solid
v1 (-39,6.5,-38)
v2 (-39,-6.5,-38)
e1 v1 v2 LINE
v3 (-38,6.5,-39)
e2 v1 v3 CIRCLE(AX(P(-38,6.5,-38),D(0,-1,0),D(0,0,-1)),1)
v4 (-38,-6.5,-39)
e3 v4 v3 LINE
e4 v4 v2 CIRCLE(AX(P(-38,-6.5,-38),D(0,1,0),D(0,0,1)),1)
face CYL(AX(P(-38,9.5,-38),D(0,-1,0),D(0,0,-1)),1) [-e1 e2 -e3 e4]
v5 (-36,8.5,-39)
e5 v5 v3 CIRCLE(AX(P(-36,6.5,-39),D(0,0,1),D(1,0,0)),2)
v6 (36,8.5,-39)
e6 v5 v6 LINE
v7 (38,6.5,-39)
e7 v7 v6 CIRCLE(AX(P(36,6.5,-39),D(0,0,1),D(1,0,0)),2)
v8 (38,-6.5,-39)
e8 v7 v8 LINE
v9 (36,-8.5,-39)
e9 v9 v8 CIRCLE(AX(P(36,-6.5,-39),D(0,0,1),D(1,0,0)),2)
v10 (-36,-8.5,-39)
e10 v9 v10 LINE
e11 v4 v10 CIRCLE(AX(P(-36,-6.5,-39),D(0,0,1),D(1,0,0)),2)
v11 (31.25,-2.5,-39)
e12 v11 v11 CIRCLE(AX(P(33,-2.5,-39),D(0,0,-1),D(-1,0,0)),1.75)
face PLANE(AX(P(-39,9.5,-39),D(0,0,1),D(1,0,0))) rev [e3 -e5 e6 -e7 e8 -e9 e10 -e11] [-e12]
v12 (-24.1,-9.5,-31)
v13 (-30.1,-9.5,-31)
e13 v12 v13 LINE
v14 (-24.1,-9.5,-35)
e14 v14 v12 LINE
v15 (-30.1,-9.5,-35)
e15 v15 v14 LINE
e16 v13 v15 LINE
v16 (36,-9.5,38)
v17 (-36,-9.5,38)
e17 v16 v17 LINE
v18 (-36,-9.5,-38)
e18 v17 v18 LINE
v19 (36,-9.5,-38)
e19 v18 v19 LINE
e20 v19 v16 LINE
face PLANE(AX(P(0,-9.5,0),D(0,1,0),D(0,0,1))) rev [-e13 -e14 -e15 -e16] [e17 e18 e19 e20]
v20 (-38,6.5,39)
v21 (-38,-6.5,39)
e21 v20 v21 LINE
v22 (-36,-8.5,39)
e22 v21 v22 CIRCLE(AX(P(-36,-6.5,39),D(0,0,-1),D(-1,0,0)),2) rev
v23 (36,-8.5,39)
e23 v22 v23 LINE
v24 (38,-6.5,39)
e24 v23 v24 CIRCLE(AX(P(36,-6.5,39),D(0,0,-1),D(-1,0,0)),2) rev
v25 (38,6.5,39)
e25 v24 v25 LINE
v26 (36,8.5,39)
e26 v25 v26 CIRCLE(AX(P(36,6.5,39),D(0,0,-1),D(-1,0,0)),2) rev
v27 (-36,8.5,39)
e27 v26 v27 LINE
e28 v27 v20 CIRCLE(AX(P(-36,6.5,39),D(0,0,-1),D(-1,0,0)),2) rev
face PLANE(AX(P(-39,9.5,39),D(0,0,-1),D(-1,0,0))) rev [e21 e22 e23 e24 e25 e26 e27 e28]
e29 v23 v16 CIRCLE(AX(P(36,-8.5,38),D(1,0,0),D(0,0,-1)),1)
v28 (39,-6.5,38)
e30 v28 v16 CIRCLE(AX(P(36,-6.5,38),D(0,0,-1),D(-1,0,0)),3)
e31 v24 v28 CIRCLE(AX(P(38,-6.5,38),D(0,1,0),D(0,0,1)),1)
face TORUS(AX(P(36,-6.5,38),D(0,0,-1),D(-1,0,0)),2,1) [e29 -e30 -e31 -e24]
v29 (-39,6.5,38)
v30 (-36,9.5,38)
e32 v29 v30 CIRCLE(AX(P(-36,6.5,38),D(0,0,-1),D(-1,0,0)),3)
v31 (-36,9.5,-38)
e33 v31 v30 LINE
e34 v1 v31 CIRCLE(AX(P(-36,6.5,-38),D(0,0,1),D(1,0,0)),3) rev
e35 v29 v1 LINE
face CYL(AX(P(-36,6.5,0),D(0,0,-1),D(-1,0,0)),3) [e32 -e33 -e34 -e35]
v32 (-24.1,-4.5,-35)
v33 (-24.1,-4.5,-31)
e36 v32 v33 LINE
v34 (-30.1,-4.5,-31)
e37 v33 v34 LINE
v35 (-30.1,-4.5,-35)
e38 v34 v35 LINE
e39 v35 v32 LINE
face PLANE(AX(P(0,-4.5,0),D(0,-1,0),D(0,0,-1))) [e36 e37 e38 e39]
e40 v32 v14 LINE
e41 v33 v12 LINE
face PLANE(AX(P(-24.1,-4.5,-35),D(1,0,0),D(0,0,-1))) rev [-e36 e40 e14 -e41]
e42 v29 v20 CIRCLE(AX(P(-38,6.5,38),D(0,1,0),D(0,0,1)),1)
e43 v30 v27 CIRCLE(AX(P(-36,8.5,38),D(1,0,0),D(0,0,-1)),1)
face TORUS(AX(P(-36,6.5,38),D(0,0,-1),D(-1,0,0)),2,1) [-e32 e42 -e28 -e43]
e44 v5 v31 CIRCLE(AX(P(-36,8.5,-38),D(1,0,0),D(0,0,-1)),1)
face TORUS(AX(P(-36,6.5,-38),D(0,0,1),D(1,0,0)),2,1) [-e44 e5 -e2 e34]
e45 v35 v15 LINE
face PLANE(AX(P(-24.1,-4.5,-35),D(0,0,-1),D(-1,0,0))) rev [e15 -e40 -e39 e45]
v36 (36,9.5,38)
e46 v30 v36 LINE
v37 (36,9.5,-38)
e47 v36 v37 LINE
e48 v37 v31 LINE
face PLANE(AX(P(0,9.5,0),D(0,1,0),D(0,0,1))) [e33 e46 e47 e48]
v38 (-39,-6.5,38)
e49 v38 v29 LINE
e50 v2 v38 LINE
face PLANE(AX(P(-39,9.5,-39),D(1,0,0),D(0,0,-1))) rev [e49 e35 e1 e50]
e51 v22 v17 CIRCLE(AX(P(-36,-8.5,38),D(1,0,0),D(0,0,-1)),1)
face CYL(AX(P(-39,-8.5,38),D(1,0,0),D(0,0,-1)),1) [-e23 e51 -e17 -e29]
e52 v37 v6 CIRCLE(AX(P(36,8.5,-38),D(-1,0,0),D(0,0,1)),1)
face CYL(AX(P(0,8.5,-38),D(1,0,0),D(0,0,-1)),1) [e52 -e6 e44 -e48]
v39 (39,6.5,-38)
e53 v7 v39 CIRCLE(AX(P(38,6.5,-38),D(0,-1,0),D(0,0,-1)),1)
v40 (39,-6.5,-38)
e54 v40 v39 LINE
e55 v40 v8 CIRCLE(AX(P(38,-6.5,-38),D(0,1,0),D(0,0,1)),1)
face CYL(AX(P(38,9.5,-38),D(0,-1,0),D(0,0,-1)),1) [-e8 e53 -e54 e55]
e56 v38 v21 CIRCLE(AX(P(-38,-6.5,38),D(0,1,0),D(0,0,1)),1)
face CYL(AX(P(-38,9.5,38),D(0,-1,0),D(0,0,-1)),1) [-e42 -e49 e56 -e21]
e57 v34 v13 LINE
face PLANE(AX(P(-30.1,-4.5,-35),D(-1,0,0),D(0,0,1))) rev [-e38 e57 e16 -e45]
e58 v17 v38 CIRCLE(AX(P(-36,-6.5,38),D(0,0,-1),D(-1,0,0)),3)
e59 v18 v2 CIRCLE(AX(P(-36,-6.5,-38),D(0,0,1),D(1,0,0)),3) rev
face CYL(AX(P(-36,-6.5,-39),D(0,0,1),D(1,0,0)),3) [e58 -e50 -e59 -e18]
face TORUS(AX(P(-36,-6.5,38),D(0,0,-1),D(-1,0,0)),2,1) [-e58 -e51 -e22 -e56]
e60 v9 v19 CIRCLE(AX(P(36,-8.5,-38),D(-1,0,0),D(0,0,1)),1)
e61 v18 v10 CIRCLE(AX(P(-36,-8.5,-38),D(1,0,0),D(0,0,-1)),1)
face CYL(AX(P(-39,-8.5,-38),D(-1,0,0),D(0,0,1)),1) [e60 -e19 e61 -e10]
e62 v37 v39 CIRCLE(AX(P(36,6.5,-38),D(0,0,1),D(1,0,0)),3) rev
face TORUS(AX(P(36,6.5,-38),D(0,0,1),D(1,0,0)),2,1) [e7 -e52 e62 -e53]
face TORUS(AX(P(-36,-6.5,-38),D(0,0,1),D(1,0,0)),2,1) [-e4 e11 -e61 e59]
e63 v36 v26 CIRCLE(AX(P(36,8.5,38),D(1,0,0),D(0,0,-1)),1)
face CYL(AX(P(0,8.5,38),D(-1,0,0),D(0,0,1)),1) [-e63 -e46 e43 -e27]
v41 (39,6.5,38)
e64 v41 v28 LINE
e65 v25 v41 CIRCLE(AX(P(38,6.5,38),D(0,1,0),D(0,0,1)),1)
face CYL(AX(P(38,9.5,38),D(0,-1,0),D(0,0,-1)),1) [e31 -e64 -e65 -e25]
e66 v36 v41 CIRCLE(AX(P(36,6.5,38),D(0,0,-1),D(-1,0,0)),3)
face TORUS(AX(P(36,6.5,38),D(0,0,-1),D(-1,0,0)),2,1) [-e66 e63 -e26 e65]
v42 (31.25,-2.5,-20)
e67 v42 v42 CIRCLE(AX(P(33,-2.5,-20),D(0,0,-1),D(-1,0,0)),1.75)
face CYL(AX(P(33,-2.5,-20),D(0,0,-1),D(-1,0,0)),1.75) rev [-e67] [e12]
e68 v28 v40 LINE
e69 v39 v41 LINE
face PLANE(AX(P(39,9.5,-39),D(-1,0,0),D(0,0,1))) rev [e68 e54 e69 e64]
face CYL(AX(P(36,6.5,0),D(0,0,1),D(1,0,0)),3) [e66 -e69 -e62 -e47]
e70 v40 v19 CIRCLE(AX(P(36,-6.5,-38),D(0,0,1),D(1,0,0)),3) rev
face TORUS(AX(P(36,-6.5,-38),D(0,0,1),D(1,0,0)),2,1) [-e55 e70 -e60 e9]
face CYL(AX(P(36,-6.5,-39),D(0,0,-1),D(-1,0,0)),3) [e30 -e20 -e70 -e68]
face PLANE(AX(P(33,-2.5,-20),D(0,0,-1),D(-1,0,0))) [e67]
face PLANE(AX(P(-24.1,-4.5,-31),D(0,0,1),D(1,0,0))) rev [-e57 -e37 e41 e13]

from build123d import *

# Parameters (mm, degrees)
SKETCH1_W           = 78
SKETCH1_H           = 78
BOSS_EXTRUDE1_DEPTH = 9.5
SKETCH2_R           = 1.75
CUT_EXTRUDE1_DEPTH  = 19
SKETCH3_W           = 6
SKETCH3_H           = 4
CUT_EXTRUDE2_DEPTH  = 5
FILLET2_R           = 1
FILLET3_R           = 3
FILLET4_R           = 1


with BuildPart() as part:
    # Sketch1 → Boss-Extrude1 (new, symmetric)
    with BuildSketch(Plane(origin=(0, 0, 0), x_dir=(1, 0, 0), z_dir=(0, 1, 0))):
        Rectangle(SKETCH1_W, SKETCH1_H)
    extrude(amount=BOSS_EXTRUDE1_DEPTH, both=True)

    # Sketch2 → Cut-Extrude1 (cut)
    with BuildSketch(Plane(origin=(0, 0, -39), x_dir=(-1, 0, 0), z_dir=(0, 0, -1))):
        with Locations((-33, -2.5)):
            Circle(SKETCH2_R)
    extrude(amount=-CUT_EXTRUDE1_DEPTH, mode=Mode.SUBTRACT)

    # Sketch3 → Cut-Extrude2 (cut)
    with BuildSketch(Plane.XZ.offset(9.5)):
        with Locations((-27.1, -33)):
            Rectangle(SKETCH3_W, SKETCH3_H)
    extrude(amount=-CUT_EXTRUDE2_DEPTH, mode=Mode.SUBTRACT)

    # Fillet2
    fillet2_edges = [part.edges().sort_by_distance(p)[0] for p in [
        (0, -9.5, -39),
        (-39, 0, -39),
        (39, 0, -39),
        (0, 9.5, -39),
    ]]
    fillet(fillet2_edges, radius=FILLET2_R)

    # Fillet3
    # the kernel refuses this fillet: 3 mm, written as the material it takes off along each edge
    with BuildSketch(Plane(origin=(36, 6.5, -39), x_dir=(0, 1, 0), z_dir=(-1, 0, 0))) as fillet3_piece_1:
        with BuildLine():
            CenterArc((2, -1), 1, 0, 90)
            Line((3, -1), (3, 0))
            Line((3, 0), (2, 0))
        make_face()
    revolve(axis=Axis((36, 6.5, -39), (0, 0, -1)), revolution_arc=90, mode=Mode.SUBTRACT)
    with BuildSketch(Plane(origin=(36, -6.5, -39), x_dir=(1, 0, 0), z_dir=(0, 1, 0))) as fillet3_piece_2:
        with BuildLine():
            CenterArc((2, -1), 1, 0, 90)
            Line((3, -1), (3, 0))
            Line((3, 0), (2, 0))
        make_face()
    revolve(axis=Axis((36, -6.5, -39), (0, 0, -1)), revolution_arc=90, mode=Mode.SUBTRACT)
    with BuildSketch(Plane(origin=(-36, 6.5, -39), x_dir=(-1, 0, 0), z_dir=(0, -1, 0))) as fillet3_piece_3:
        with BuildLine():
            CenterArc((2, -1), 1, 0, 90)
            Line((3, -1), (3, 0))
            Line((3, 0), (2, 0))
        make_face()
    revolve(axis=Axis((-36, 6.5, -39), (0, 0, -1)), revolution_arc=90, mode=Mode.SUBTRACT)
    with BuildSketch(Plane(origin=(-36, -6.5, -39), x_dir=(0, -1, 0), z_dir=(1, 0, 0))) as fillet3_piece_4:
        with BuildLine():
            CenterArc((2, -1), 1, 0, 90)
            Line((3, -1), (3, 0))
            Line((3, 0), (2, 0))
        make_face()
    revolve(axis=Axis((-36, -6.5, -39), (0, 0, -1)), revolution_arc=90, mode=Mode.SUBTRACT)
    with BuildSketch(Plane(origin=(-39, -9.5, 46.5), x_dir=(1, 0, 0), z_dir=(0, 0, -1)), Plane(origin=(-39, 9.5, 46.5), x_dir=(0, -1, 0), z_dir=(0, 0, -1)), Plane(origin=(39, 9.5, -39), x_dir=(0, -1, 0), z_dir=(0, 0, 1)), Plane(origin=(39, -9.5, -39), x_dir=(-1, 0, 0), z_dir=(0, 0, 1))) as fillet3_piece_5:
        with BuildLine():
            CenterArc((FILLET3_R, -FILLET3_R), FILLET3_R, 90, 90)
            Line((0, -FILLET3_R), (0, 0))
            Line((0, 0), (FILLET3_R, 0))
        make_face()
    extrude(amount=85.5, mode=Mode.SUBTRACT)

    # Fillet4
    fillet4_edges = [part.edges().sort_by_distance(p)[0] for p in [
        (0, 9.5, 39),
        (0, -9.5, 39),
        (39, 0, 39),
        (-39, 0, 39),
        (38.121320344, -8.621320344, 39),
        (38.121320344, 8.621320344, 39),
        (-38.121320344, -8.621320344, 39),
        (-38.121320344, 8.621320344, 39),
    ]]
    fillet(fillet4_edges, radius=FILLET4_R)


solid = part.part
